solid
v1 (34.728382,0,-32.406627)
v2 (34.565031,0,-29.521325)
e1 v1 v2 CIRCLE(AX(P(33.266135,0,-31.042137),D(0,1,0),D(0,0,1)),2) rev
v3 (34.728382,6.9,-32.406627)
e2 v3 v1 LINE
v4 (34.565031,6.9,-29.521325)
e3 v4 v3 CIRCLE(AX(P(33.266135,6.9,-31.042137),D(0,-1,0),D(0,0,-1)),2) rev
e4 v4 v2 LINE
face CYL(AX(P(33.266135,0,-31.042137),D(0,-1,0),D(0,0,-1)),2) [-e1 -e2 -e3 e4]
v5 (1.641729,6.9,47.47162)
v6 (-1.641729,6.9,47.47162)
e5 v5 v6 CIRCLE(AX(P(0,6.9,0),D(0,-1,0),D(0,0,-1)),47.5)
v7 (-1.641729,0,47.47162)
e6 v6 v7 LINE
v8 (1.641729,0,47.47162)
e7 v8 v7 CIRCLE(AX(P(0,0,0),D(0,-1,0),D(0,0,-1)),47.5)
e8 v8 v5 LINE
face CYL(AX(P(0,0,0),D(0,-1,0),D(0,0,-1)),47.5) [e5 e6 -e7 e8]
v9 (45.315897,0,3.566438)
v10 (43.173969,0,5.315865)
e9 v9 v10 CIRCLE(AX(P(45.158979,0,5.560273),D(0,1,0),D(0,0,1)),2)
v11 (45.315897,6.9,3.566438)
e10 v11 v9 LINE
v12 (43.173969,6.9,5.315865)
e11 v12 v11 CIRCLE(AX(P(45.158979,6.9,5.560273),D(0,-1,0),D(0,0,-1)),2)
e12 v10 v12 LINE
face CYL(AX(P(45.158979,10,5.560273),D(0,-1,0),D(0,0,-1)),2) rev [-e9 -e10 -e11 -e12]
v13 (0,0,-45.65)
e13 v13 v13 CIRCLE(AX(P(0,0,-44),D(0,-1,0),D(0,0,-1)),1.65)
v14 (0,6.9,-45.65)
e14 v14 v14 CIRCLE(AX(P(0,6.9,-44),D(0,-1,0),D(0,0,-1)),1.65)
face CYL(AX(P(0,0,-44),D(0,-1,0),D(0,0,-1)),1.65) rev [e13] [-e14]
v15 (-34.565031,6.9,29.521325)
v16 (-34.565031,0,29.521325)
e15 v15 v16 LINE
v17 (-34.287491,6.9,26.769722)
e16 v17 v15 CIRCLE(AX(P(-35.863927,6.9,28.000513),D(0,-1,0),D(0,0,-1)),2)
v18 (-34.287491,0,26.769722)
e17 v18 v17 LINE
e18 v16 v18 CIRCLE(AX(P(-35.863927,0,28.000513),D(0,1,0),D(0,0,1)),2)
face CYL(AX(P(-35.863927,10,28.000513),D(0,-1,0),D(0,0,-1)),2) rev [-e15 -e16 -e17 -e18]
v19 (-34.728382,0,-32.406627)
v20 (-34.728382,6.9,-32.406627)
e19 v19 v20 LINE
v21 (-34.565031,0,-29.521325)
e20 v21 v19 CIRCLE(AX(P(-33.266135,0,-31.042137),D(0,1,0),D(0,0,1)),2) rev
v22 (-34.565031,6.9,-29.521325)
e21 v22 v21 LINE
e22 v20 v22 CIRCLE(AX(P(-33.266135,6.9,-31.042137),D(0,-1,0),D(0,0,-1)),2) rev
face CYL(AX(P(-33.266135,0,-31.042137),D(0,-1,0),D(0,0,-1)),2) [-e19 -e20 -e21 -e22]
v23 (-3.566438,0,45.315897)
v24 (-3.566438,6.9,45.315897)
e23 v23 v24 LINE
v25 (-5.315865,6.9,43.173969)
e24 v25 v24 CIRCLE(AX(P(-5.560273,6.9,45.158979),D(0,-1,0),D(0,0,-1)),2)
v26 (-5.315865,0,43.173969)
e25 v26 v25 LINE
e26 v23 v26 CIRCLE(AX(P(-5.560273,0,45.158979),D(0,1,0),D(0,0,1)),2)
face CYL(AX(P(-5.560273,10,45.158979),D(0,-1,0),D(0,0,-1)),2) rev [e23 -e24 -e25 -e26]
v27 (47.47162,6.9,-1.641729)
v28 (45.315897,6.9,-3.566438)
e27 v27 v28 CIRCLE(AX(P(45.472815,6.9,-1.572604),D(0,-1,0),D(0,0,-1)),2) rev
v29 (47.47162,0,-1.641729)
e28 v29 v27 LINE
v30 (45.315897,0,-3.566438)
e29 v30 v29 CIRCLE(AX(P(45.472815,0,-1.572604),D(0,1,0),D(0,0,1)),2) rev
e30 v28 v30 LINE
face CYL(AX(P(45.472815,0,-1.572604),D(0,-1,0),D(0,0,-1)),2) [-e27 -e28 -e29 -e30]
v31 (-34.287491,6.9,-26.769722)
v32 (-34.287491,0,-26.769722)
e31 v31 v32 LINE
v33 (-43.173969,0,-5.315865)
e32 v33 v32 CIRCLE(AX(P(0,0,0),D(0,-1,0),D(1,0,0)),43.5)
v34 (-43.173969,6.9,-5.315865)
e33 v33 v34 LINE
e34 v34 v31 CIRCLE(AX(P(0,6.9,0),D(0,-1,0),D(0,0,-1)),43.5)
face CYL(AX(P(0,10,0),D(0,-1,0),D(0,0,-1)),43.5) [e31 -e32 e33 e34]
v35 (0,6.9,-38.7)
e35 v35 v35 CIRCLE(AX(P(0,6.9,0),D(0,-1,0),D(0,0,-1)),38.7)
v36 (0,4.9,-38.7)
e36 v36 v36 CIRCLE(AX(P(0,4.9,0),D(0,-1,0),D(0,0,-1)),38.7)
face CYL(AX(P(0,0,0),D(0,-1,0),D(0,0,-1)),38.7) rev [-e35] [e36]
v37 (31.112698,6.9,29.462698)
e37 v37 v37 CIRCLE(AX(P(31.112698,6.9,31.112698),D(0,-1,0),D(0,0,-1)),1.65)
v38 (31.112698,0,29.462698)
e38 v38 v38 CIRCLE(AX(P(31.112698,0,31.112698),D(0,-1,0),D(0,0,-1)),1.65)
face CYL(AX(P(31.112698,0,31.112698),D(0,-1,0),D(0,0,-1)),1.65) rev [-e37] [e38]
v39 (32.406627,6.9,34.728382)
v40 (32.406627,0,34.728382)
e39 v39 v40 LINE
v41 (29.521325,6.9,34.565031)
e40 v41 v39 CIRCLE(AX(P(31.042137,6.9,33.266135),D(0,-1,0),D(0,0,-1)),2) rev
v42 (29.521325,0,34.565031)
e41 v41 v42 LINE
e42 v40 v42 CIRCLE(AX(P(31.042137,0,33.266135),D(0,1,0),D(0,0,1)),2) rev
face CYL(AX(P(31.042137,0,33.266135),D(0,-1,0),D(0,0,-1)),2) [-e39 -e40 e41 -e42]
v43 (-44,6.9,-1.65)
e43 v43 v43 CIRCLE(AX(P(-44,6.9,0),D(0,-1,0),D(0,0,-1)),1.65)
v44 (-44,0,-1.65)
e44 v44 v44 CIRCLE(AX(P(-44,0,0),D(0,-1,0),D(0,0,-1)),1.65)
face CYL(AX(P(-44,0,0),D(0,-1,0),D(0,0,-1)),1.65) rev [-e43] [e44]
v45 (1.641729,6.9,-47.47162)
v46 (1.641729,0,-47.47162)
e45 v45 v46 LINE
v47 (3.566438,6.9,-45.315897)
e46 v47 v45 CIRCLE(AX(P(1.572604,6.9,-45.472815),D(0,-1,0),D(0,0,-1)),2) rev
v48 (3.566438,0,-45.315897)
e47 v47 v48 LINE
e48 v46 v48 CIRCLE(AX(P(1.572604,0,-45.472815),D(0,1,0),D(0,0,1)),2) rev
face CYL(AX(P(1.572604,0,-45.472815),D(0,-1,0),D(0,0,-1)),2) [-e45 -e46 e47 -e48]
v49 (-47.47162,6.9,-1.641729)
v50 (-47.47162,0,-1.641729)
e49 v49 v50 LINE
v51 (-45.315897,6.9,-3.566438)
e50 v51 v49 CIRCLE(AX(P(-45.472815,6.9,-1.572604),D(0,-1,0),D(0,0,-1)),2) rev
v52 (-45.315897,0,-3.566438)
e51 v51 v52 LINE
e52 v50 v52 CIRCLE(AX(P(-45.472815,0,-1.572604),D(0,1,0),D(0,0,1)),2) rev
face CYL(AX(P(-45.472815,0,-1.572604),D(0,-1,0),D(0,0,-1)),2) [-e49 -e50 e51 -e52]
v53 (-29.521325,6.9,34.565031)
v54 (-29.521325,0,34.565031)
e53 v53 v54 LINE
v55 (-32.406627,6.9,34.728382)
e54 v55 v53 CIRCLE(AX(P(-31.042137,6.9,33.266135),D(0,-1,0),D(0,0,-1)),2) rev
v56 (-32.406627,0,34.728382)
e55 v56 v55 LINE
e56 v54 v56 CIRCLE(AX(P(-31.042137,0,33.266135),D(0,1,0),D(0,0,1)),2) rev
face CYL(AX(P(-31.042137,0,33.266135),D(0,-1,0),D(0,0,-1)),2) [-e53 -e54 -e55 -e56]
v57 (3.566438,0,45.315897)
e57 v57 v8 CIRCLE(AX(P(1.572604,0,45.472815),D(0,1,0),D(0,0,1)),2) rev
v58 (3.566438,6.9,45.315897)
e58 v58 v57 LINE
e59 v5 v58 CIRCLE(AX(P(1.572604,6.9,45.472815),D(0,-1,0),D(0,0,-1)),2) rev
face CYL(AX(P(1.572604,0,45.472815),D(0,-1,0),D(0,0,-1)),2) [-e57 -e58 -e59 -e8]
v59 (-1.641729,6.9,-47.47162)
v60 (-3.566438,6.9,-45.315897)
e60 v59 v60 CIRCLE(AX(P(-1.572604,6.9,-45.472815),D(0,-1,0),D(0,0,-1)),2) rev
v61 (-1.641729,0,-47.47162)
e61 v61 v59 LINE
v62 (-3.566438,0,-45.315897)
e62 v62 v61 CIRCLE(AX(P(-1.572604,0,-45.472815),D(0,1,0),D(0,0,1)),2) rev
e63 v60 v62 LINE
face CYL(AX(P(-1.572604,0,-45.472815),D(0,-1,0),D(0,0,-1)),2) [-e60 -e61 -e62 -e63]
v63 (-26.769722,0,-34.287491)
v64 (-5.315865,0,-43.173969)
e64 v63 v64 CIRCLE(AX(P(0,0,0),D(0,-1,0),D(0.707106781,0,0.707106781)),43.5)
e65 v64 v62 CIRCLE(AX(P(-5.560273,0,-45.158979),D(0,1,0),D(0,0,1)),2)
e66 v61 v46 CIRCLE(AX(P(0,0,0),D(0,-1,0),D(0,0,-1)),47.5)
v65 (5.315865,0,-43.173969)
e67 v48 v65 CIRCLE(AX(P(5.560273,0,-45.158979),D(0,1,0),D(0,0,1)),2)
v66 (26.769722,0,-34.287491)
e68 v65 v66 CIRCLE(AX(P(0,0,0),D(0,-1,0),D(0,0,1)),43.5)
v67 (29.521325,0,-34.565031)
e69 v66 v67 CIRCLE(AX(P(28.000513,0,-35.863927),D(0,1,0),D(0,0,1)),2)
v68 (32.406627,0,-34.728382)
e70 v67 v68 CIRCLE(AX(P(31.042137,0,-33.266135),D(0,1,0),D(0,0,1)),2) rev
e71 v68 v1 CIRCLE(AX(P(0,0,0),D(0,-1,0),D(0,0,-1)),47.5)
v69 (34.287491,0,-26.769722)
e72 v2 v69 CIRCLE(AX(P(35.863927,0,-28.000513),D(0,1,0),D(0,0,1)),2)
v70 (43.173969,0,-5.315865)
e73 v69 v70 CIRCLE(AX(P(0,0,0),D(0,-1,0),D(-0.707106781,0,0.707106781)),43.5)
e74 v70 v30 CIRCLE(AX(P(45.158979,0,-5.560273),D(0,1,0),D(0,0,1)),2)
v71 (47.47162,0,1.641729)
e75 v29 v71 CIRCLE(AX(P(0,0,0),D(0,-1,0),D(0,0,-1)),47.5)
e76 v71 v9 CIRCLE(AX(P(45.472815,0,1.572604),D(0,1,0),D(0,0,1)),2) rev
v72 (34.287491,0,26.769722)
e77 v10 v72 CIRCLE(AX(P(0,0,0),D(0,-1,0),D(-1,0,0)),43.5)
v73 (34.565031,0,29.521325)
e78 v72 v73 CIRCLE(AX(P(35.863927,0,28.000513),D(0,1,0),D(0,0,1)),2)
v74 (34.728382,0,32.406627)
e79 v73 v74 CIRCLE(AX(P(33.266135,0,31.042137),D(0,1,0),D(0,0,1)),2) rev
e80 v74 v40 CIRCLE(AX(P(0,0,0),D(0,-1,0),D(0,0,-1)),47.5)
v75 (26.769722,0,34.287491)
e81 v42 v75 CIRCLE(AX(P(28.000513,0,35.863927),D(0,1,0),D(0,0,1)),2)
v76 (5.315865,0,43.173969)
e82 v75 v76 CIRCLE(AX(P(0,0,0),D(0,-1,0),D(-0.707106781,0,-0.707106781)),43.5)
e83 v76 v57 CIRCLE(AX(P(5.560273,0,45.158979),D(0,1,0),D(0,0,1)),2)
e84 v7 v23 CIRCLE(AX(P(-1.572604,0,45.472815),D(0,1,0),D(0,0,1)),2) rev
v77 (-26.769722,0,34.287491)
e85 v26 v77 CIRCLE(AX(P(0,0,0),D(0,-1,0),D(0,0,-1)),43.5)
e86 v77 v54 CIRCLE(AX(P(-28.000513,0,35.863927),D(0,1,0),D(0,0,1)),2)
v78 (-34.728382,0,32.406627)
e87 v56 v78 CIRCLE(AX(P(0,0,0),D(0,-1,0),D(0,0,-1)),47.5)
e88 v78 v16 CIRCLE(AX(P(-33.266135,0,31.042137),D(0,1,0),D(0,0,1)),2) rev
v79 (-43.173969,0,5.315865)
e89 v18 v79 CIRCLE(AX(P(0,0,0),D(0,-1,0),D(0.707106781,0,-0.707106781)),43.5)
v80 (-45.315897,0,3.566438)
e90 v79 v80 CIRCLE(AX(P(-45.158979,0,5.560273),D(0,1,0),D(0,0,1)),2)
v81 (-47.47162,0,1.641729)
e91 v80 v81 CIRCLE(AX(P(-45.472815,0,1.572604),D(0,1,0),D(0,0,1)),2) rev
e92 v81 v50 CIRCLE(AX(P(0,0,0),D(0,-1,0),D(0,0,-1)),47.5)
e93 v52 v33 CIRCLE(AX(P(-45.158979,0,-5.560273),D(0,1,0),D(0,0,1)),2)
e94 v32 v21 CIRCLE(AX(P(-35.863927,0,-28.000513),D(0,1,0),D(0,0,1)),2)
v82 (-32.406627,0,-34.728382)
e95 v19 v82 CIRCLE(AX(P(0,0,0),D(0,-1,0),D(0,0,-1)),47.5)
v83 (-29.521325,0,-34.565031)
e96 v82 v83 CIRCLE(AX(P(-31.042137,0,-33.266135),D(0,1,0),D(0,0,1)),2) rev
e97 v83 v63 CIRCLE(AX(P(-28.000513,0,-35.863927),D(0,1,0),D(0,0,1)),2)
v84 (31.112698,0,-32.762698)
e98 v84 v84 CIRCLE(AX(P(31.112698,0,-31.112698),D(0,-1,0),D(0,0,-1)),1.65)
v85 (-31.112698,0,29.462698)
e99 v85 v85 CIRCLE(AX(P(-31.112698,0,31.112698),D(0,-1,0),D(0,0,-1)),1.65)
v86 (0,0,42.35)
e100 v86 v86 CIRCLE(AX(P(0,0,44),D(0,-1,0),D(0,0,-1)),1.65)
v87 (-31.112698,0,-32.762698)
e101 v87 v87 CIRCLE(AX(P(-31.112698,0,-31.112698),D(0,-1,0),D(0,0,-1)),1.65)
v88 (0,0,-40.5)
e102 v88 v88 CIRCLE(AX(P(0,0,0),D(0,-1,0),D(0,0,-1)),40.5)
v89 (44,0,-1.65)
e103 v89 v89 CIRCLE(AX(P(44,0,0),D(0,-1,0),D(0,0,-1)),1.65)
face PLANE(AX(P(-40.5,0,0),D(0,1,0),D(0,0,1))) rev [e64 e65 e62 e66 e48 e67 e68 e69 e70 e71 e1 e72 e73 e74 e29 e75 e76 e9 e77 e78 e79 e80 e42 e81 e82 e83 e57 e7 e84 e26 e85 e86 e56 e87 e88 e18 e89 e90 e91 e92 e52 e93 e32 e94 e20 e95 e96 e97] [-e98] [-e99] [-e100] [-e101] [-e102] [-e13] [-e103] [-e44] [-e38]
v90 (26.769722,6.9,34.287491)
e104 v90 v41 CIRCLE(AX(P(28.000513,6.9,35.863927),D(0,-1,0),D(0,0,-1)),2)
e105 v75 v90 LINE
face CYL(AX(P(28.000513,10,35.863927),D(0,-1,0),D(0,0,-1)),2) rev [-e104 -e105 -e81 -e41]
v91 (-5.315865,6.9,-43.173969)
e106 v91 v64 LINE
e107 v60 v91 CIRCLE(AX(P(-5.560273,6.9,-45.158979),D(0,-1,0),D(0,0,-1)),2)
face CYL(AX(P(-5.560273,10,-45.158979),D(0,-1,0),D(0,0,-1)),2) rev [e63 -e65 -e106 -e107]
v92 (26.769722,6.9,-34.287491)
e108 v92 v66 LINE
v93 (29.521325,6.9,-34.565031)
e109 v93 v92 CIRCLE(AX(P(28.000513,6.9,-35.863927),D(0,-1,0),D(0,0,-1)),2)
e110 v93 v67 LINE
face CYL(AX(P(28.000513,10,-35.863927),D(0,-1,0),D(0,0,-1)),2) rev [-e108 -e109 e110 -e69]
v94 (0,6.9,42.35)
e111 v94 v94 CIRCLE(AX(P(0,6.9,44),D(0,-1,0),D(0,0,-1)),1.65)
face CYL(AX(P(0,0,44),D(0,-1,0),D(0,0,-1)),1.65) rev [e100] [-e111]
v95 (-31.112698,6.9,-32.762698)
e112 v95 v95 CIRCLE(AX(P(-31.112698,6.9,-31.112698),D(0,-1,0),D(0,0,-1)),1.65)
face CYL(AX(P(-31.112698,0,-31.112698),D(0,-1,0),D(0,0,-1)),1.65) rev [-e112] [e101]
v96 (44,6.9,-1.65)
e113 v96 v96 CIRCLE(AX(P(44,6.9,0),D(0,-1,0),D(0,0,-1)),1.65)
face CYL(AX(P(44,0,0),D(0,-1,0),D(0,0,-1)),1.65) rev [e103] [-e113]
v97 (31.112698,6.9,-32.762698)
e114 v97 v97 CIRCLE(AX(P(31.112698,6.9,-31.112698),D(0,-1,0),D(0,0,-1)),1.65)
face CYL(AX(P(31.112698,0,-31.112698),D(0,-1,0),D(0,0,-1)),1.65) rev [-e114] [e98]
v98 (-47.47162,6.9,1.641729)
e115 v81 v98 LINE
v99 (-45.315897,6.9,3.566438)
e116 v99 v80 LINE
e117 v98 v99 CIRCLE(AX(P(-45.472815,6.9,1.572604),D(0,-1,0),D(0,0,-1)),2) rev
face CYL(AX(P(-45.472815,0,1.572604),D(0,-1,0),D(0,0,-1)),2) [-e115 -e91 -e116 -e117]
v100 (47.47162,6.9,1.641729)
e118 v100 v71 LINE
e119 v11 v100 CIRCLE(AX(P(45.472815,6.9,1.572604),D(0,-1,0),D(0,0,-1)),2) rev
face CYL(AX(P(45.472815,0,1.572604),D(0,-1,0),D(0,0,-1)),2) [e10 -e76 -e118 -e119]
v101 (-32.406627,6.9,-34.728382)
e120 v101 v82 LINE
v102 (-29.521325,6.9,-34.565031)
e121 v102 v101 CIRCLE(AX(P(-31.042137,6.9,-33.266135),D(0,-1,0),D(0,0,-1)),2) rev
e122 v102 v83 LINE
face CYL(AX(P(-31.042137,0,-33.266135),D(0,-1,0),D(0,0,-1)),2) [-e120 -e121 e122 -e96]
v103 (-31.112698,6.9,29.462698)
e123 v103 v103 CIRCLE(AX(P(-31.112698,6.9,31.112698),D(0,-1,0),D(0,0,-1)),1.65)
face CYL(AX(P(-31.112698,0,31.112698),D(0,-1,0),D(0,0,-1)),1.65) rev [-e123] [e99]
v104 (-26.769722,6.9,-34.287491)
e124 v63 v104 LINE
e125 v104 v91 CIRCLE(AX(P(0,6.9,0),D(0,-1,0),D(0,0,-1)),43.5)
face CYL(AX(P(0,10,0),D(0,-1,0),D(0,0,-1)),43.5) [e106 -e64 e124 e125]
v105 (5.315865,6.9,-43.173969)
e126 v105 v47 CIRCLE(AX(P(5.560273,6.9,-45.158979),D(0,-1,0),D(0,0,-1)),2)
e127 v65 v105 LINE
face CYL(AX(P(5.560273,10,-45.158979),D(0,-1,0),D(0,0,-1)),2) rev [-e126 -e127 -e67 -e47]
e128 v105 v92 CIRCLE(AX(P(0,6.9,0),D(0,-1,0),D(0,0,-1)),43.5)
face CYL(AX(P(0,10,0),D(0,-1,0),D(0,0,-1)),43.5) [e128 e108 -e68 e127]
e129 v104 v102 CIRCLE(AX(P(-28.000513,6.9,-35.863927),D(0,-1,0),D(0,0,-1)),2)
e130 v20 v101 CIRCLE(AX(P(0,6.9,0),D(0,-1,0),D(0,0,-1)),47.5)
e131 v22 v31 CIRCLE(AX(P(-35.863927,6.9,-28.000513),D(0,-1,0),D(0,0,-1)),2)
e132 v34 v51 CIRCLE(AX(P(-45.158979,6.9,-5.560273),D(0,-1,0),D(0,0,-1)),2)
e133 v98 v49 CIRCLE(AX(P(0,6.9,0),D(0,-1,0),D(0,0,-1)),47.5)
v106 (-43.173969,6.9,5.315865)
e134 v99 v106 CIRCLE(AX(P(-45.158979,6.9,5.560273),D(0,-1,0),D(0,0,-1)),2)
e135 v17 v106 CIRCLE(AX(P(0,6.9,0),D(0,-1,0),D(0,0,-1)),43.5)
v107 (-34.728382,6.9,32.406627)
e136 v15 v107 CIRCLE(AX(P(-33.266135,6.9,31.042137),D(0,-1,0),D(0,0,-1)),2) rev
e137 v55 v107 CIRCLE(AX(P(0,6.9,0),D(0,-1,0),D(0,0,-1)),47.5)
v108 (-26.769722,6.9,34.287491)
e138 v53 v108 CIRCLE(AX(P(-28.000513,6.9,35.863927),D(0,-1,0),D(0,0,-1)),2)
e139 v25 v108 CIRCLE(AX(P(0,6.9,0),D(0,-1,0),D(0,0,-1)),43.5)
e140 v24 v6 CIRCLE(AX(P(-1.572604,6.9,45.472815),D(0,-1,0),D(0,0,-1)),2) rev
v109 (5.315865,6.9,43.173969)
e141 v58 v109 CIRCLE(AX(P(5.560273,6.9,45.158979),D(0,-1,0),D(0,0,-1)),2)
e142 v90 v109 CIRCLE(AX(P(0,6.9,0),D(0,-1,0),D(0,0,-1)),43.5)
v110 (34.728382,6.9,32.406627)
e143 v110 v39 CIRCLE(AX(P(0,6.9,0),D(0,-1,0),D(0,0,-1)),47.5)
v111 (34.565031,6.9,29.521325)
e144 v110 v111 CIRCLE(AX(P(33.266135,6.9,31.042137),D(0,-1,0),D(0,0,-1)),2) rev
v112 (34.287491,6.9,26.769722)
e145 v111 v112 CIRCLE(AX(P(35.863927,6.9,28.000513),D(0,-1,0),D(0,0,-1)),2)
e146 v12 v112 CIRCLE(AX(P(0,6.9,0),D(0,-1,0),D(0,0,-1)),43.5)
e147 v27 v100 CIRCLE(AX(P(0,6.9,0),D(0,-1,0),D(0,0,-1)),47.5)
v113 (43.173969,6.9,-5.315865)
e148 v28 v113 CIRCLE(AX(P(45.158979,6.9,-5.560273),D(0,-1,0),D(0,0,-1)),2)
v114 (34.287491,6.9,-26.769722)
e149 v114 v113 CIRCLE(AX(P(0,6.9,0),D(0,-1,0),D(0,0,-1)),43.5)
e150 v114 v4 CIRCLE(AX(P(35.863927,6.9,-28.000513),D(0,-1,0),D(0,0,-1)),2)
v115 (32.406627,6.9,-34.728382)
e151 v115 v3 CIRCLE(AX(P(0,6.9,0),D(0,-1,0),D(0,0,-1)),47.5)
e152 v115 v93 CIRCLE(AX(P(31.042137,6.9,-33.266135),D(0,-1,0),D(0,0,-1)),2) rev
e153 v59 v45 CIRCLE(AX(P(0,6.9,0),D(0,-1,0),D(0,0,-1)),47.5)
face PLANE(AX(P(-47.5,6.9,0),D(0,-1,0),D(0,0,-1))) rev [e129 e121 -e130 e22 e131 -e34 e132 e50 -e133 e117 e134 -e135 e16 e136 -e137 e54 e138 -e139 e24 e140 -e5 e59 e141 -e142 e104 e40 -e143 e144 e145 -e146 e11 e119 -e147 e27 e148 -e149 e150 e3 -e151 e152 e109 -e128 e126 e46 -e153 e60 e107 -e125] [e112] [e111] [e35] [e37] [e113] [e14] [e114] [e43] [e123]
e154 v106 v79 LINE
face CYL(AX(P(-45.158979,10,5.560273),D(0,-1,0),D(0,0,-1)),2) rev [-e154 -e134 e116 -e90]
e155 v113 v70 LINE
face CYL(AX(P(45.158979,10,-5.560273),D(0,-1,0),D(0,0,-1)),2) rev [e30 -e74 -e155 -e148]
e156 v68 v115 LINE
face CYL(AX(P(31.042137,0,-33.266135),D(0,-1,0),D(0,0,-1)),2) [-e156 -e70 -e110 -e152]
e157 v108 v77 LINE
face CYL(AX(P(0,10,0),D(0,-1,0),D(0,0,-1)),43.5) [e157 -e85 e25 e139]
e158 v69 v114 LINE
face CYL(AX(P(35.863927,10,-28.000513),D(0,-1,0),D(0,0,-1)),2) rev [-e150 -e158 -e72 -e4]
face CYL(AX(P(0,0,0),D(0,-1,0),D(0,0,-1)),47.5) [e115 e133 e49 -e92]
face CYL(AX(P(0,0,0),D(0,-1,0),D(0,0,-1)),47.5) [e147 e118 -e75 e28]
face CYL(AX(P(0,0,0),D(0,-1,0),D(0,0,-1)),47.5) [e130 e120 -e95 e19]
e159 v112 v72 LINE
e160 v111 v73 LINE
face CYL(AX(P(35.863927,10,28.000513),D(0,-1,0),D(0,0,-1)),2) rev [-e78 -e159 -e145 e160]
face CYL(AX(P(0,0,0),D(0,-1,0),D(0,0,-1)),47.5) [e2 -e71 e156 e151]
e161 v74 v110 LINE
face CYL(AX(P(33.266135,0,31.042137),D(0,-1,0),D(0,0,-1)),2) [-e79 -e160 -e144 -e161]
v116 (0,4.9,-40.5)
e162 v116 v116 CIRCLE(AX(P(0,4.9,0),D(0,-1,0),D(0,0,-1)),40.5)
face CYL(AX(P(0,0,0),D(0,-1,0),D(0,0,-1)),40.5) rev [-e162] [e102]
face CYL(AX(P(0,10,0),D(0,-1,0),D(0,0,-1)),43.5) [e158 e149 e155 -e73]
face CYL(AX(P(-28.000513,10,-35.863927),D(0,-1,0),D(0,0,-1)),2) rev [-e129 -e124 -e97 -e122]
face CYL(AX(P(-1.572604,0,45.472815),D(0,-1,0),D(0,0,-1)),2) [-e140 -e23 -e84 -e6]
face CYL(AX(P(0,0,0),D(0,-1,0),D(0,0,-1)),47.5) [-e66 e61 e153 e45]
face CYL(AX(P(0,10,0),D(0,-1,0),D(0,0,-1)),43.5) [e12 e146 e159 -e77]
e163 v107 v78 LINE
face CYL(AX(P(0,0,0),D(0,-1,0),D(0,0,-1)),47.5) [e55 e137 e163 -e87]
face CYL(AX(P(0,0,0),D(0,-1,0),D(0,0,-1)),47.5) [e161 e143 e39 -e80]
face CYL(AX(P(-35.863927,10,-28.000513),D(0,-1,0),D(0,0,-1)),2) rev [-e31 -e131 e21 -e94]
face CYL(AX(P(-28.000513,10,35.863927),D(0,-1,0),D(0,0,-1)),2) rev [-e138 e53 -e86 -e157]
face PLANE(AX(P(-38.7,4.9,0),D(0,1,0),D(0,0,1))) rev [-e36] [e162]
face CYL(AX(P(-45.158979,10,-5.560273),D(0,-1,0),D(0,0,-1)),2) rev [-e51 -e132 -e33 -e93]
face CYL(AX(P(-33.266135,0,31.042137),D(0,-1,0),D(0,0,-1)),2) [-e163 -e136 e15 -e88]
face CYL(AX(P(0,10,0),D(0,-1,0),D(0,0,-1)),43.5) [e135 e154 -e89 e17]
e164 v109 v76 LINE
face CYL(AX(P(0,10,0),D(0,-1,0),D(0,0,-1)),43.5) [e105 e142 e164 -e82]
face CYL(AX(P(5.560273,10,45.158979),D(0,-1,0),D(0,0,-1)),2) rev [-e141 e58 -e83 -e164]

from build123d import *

# Parameters (mm, degrees)
PATTERN_CIRCULAR_1_COUNT = 8
CUT_EXTRUDE_START        = -10
CUT_EXTRUDE_1_DEPTH      = 10
PATTERN_CIRCULAR_2_COUNT = 8
FILLET_2_R               = 2


with BuildPart() as part:
    # 草图1 → 旋转1 (revolve)
    with BuildSketch(Plane.XY, mode=Mode.PRIVATE) as revolve_1_sk:
        Polygon((-40.5, 0), (-47.5, 0), (-47.5, 6.9), (-38.7, 6.9), (-38.7, 4.9), (-40.5, 4.9), align=None)
    revolve(revolve_1_sk.sketch.rotate(Axis((0, 0, 0), (0, 1, 0)), 270), axis=Axis((0, 0, 0), (0, 1, 0)))

    # 草图4 → M4 螺纹孔1 (revolve, cut)
    with BuildSketch(Plane(origin=(0, 0, 44), x_dir=(0, 0, -1), z_dir=(1, 0, 0))):
        Polygon((0, 0), (0, 8.991420021), (1.65, 8), (1.65, 0), align=None)
    hole_wizard_m4_1 = revolve(axis=Axis((0, -6.35, 44), (0, 1, 0)), mode=Mode.SUBTRACT)

    # 阵列(圆周)1: M4 螺纹孔1 ×8 about axis
    pattern_circular_1_axis = Axis((0, 0, 0), (0, 1, 0))
    for i in range(1, PATTERN_CIRCULAR_1_COUNT):
        add(hole_wizard_m4_1.rotate(pattern_circular_1_axis, i * 360 / PATTERN_CIRCULAR_1_COUNT), mode=Mode.SUBTRACT)

    # 草图5 → 切除-拉伸1 (cut)
    with BuildSketch(Plane.XZ.offset(CUT_EXTRUDE_START)):
        with BuildLine():
            Line((-30.848782296, 36.119283366), (-28.250990102, 33.077659504))
            ThreePointArc((-28.250990102, 33.077659504), (-16.646729308, 40.188759664), (-3.412970664, 43.365904017))
            Line((-3.412970664, 43.365904017), (-3.726807047, 47.353573352))
            ThreePointArc((-3.726807047, 47.353573352), (-18.177463037, 43.884277794), (-30.848782296, 36.119283366))
        make_face()
    cut_extrude_1 = extrude(amount=CUT_EXTRUDE_1_DEPTH, mode=Mode.SUBTRACT)

    # 阵列(圆周)2: 切除-拉伸1 ×8 about axis
    pattern_circular_2_axis = Axis((0, 0, 0), (0, 1, 0))
    for i in range(1, PATTERN_CIRCULAR_2_COUNT):
        add(cut_extrude_1.rotate(pattern_circular_2_axis, i * 360 / PATTERN_CIRCULAR_2_COUNT), mode=Mode.SUBTRACT)

    # 圆角2
    fillet_2_edges = [part.edges().sort_by_distance(p)[0] for p in [
        (-3.412970664, 3.45, 43.365904017),
        (-28.250990102, 3.45, 33.077659504),
        (-30.848782296, 3.45, 36.119283366),
        (-36.119283366, 3.45, 30.848782296),
        (-33.077659504, 3.45, 28.250990102),
        (-43.365904017, 3.45, 3.412970664),
        (-47.353573352, 3.45, 3.726807047),
        (-47.353573352, 3.45, -3.726807047),
        (-43.365904017, 3.45, -3.412970664),
        (-33.077659504, 3.45, -28.250990102),
        (-36.119283366, 3.45, -30.848782296),
        (-30.848782296, 3.45, -36.119283366),
        (-28.250990102, 3.45, -33.077659504),
        (-3.412970664, 3.45, -43.365904017),
        (-3.726807047, 3.45, -47.353573352),
        (3.726807047, 3.45, -47.353573352),
        (3.412970664, 3.45, -43.365904017),
        (28.250990102, 3.45, -33.077659504),
        (30.848782296, 3.45, -36.119283366),
        (36.119283366, 3.45, -30.848782296),
        (33.077659504, 3.45, -28.250990102),
        (43.365904017, 3.45, -3.412970664),
        (47.353573352, 3.45, -3.726807047),
        (47.353573352, 3.45, 3.726807047),
        (43.365904017, 3.45, 3.412970664),
        (33.077659504, 3.45, 28.250990102),
        (36.119283366, 3.45, 30.848782296),
        (30.848782296, 3.45, 36.119283366),
        (28.250990102, 3.45, 33.077659504),
        (3.412970664, 3.45, 43.365904017),
        (3.726807047, 3.45, 47.353573352),
        (-3.726807047, 3.45, 47.353573352),
    ]]
    fillet(fillet_2_edges, radius=FILLET_2_R - 0.0001)  # a hair under: the kernel refuses the full size


solid = part.part
